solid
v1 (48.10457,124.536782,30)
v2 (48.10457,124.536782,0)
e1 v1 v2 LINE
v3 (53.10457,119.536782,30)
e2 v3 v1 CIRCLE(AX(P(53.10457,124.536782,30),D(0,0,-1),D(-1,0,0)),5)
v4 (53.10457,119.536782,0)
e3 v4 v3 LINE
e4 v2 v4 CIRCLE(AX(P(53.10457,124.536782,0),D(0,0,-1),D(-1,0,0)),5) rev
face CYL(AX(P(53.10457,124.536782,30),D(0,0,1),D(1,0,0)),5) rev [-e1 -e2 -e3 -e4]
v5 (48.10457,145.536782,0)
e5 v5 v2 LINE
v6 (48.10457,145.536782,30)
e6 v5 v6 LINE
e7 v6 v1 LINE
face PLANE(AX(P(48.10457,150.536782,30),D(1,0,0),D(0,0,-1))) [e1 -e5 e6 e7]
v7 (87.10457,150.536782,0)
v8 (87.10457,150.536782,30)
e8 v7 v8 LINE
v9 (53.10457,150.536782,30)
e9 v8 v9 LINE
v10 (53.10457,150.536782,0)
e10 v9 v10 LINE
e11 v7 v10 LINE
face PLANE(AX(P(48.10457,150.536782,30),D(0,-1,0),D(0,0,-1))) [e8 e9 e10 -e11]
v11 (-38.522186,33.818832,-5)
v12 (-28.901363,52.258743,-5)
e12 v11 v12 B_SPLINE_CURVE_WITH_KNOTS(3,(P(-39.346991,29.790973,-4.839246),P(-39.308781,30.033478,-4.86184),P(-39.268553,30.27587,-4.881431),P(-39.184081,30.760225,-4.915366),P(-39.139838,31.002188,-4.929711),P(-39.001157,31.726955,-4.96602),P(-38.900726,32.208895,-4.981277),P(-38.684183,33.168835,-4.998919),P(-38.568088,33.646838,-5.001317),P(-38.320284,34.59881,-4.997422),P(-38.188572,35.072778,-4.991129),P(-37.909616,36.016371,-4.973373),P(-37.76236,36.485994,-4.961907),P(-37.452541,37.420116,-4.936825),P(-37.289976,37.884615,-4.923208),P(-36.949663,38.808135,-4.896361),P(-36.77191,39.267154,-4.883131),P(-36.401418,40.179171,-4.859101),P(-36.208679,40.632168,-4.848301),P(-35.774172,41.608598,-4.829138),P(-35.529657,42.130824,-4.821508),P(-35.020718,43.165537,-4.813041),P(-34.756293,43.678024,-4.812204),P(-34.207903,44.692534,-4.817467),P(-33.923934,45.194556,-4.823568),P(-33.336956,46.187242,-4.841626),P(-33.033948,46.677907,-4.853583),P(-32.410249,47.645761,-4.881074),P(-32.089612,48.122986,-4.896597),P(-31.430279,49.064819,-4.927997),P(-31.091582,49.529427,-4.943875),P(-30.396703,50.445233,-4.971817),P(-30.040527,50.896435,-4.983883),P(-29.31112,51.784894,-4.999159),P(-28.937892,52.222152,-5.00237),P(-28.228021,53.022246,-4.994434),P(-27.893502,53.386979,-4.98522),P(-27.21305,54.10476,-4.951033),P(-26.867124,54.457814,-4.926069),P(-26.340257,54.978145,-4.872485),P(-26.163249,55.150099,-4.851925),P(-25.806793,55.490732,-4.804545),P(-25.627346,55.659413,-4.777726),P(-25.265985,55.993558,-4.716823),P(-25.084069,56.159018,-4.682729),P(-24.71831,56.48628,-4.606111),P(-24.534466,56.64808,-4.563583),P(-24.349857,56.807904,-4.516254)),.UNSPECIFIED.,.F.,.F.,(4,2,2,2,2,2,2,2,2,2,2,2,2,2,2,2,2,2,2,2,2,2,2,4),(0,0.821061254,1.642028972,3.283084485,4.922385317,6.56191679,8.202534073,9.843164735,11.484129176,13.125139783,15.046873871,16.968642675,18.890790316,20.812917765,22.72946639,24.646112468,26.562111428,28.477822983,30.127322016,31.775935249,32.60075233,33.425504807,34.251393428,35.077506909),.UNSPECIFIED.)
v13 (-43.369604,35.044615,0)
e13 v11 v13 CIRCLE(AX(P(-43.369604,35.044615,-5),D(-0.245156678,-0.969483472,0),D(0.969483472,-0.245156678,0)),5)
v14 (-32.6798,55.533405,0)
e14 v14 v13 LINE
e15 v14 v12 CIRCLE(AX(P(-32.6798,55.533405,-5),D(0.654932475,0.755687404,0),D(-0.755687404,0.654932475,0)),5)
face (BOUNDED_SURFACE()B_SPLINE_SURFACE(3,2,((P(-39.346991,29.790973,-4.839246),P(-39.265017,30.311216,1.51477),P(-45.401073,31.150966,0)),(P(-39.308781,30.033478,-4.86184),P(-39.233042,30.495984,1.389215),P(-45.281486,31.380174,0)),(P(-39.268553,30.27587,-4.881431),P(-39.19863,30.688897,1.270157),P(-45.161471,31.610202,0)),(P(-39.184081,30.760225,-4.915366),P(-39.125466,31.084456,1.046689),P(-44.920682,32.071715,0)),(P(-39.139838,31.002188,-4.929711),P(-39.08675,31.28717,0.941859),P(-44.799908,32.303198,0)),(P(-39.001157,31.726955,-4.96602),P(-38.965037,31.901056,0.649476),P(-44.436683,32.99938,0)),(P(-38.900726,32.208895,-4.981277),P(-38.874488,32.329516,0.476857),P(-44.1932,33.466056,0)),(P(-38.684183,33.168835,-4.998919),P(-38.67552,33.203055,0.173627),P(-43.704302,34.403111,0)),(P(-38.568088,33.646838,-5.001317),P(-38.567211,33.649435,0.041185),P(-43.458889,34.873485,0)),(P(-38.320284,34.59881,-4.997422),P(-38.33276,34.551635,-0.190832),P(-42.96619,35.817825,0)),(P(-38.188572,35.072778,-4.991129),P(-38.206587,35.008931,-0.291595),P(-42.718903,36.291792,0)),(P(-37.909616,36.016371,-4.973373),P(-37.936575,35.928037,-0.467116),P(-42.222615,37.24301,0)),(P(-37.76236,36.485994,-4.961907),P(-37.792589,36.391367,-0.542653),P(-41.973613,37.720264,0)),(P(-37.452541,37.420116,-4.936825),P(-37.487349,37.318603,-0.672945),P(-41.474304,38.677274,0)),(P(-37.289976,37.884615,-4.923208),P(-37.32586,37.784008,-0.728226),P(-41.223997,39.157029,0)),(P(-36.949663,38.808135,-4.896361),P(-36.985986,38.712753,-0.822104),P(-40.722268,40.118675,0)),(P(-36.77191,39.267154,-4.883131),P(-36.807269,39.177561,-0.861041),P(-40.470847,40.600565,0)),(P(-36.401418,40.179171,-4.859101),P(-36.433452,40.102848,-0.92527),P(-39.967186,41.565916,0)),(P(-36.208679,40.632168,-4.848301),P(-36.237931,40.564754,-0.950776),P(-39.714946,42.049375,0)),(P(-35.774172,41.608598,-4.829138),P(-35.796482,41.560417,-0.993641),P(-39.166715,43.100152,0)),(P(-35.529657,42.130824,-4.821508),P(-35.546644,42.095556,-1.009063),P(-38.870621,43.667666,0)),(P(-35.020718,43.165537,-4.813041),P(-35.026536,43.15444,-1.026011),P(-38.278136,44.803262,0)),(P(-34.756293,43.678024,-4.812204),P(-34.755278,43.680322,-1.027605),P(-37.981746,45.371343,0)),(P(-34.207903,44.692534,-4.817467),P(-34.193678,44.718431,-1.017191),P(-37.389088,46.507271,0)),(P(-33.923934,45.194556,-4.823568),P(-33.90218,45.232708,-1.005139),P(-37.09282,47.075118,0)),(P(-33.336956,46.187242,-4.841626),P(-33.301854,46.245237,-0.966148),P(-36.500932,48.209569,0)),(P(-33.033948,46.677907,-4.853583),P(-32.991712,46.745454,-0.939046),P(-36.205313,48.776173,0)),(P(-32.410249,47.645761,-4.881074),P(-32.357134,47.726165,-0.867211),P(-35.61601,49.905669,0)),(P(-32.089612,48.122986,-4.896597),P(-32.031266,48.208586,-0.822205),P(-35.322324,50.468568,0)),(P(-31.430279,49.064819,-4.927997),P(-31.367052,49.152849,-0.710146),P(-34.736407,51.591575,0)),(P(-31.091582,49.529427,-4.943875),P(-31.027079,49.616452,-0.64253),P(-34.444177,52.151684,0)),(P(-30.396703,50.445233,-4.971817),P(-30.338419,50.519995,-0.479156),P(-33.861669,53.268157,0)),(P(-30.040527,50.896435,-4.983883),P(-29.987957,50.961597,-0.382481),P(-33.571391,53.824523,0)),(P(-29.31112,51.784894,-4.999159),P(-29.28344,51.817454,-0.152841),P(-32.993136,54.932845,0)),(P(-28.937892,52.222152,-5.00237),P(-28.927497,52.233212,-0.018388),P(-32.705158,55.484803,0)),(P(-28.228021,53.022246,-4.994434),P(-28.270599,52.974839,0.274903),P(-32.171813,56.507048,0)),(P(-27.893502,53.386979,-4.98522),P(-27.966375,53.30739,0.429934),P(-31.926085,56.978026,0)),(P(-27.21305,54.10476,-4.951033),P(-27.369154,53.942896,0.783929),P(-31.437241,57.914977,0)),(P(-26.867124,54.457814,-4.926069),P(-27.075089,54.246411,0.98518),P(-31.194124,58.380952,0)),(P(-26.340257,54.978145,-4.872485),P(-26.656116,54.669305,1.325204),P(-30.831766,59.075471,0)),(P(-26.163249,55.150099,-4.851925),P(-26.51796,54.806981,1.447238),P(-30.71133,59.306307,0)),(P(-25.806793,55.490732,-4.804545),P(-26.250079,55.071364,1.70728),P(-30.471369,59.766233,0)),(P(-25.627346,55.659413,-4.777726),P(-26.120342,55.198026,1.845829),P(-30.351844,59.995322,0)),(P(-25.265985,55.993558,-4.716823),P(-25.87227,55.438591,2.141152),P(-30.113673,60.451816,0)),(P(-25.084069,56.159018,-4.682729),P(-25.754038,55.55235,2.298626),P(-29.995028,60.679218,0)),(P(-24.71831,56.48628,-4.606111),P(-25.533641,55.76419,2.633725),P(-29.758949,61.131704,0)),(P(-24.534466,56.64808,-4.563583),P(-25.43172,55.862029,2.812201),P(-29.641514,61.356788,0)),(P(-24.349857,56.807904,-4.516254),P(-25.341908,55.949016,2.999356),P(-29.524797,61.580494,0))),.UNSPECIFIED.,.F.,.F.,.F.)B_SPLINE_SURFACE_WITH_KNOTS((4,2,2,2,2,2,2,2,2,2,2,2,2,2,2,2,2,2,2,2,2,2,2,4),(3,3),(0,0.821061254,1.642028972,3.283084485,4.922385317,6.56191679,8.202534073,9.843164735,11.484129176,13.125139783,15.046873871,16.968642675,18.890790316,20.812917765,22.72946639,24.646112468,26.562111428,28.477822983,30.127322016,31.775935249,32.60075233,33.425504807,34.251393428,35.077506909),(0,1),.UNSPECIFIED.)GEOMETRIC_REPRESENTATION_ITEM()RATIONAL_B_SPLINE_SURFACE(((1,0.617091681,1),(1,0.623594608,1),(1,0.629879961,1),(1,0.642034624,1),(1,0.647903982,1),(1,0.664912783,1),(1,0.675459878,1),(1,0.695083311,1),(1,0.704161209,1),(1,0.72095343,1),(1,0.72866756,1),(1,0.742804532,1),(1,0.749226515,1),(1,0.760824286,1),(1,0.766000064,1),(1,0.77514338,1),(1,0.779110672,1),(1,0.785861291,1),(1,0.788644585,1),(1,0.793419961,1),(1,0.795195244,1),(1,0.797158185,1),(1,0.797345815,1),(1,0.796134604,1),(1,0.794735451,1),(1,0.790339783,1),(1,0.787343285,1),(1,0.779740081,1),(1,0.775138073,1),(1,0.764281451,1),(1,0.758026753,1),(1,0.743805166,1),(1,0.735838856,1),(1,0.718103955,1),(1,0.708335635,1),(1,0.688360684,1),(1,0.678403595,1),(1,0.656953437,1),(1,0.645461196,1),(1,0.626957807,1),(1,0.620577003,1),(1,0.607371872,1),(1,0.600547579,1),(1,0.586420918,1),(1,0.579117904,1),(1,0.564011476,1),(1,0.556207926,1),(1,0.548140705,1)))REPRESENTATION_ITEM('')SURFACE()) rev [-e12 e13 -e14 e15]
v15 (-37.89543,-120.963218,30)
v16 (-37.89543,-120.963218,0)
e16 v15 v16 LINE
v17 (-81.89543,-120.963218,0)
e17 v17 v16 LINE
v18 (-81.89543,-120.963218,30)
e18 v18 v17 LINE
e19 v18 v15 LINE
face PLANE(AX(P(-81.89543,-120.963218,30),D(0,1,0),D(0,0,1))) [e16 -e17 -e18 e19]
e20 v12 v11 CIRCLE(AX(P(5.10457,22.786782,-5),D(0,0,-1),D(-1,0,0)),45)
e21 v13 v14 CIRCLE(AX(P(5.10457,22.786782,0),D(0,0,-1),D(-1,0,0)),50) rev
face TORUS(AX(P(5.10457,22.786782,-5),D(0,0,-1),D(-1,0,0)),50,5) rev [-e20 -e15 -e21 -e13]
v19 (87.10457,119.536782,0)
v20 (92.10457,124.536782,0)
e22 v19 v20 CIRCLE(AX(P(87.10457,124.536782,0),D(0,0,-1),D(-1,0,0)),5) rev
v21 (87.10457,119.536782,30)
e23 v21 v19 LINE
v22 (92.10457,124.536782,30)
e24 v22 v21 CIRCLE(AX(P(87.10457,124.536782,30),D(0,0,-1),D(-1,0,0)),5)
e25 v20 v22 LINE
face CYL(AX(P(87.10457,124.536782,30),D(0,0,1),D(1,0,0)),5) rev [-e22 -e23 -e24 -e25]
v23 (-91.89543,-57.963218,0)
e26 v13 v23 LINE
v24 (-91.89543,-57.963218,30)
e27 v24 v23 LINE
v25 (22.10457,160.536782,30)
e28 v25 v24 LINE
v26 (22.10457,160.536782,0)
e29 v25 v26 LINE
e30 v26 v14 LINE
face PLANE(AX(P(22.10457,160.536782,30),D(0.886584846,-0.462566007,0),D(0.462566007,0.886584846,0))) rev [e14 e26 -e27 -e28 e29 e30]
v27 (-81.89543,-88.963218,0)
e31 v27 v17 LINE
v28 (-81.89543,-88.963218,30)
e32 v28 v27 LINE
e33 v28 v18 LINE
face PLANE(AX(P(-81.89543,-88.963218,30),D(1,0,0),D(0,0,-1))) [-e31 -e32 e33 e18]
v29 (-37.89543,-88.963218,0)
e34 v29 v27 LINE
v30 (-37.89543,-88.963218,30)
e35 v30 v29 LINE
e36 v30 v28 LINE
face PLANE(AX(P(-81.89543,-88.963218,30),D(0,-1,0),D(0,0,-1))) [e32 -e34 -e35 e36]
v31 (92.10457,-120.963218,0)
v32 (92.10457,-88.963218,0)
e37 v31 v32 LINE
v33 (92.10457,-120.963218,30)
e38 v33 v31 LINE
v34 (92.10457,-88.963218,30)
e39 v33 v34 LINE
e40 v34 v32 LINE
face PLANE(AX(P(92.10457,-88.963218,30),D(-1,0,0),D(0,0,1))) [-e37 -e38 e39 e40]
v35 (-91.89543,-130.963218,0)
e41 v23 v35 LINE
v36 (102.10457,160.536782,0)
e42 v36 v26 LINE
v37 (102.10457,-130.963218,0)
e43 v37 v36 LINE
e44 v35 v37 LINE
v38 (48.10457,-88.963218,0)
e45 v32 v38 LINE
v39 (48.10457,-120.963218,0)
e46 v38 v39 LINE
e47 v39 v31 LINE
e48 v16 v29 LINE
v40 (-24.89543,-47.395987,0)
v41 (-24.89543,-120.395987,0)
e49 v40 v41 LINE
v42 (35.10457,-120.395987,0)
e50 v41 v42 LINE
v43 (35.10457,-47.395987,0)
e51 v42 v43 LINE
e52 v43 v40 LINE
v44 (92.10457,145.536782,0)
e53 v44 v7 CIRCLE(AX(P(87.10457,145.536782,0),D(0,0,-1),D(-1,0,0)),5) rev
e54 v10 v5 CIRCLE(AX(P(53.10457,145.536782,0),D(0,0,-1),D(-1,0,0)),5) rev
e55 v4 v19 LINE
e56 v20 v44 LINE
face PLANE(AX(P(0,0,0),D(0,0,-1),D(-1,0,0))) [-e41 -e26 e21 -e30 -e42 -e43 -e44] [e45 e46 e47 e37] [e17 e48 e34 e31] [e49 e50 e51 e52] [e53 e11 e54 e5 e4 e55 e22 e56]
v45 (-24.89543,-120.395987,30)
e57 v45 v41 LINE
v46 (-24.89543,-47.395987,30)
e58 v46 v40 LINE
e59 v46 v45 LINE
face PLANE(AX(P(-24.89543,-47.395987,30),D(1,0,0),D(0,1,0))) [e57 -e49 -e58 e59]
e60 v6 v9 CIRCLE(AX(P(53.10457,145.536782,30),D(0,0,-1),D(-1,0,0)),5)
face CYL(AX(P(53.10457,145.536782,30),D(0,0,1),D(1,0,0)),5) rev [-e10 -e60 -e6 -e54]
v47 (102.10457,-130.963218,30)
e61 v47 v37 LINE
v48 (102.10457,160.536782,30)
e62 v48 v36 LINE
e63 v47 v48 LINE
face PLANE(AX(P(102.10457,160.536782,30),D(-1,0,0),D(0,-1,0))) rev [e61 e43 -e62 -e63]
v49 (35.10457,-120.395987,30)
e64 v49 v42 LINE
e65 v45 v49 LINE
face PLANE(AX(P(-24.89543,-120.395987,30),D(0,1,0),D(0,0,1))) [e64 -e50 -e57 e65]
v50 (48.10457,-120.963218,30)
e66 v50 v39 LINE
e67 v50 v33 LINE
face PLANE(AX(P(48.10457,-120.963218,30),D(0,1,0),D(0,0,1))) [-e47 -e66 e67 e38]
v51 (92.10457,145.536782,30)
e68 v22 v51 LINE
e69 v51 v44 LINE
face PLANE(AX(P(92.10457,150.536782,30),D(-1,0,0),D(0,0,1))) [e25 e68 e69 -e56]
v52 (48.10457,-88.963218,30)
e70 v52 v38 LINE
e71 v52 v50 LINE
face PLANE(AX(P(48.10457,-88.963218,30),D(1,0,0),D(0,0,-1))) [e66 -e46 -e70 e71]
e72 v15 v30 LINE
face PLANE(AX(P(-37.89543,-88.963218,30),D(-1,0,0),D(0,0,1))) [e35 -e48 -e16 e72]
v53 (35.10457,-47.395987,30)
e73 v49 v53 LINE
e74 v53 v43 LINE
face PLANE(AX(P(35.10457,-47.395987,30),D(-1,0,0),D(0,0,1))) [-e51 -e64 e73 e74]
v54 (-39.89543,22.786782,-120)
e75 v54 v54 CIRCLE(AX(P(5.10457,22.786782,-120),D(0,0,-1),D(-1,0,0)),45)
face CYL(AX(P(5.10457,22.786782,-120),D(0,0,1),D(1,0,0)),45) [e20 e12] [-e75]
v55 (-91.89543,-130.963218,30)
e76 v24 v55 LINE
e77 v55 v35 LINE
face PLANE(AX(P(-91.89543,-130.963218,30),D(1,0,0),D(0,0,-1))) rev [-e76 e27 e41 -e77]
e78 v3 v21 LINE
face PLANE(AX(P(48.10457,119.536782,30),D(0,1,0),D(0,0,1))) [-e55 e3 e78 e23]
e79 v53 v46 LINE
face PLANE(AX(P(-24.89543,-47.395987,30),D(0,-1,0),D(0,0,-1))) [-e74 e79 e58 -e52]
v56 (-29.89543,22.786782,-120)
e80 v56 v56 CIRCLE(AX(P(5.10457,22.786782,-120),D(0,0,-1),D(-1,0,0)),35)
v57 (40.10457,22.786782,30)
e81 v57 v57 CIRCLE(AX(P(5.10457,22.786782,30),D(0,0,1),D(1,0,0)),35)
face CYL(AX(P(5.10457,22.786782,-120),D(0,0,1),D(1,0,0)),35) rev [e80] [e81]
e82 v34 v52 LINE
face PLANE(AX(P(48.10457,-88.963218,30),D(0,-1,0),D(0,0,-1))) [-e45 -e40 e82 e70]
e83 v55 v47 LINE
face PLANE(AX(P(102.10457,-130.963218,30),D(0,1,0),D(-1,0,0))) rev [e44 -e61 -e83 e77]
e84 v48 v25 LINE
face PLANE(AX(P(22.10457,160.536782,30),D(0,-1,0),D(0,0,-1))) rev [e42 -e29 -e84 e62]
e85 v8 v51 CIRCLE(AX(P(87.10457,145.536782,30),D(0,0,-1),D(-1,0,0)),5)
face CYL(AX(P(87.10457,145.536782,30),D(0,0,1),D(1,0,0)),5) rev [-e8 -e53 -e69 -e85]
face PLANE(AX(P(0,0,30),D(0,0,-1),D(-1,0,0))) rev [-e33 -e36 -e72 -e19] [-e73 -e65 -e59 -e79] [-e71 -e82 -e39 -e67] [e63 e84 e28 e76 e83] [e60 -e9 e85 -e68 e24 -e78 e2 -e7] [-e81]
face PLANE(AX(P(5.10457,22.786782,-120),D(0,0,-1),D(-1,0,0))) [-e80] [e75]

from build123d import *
from build123d.topology import SkipClean

# Parameters (mm, degrees)
SKETCH2_W           = 44
SKETCH2_H           = 31
SKETCH2_H_2         = 32
SKETCH2_W_2         = 60
SKETCH2_H_3         = 73
BOSS_EXTRUDE1_DEPTH = 30
SKETCH3_R           = 45
SKETCH3_R_2         = 35
BOSS_EXTRUDE2_DEPTH = 120
FILLET1_R           = 5
SKETCH6_R           = 35
CUT_EXTRUDE1_DEPTH  = 120
FILLET2_R           = 5


with BuildPart() as part:
    # Sketch2 → Boss-Extrude1 (new body)
    with BuildSketch(Plane.XY):
        Polygon((22.104569931, 160.536781585), (102.104569931, 160.536781585), (102.104569931, -130.963218415), (-91.895430069, -130.963218415), (-91.895430069, -57.963218415), align=None)
        with Locations((70.104569931, 135.036781585)):
            Rectangle(SKETCH2_W, SKETCH2_H, mode=Mode.SUBTRACT)
        with Locations((70.104569931, -104.963218415)):
            Rectangle(SKETCH2_W, SKETCH2_H_2, mode=Mode.SUBTRACT)
        with Locations((-59.895430069, -104.963218415)):
            Rectangle(SKETCH2_W, SKETCH2_H_2, mode=Mode.SUBTRACT)
        with Locations((5.104569931, -83.895986651)):
            Rectangle(SKETCH2_W_2, SKETCH2_H_3, mode=Mode.SUBTRACT)
    extrude(amount=BOSS_EXTRUDE1_DEPTH)

    # Sketch3 → Boss-Extrude2 (add)
    with BuildSketch(Plane(origin=(0, 0, 0), x_dir=(-1, 0, 0), z_dir=(0, 0, -1))):
        with Locations((-5.104569931, 22.786781585)):
            Circle(SKETCH3_R)
        with Locations((-5.104569931, 22.786781585)):
            Circle(SKETCH3_R_2, mode=Mode.SUBTRACT)
    extrude(amount=BOSS_EXTRUDE2_DEPTH)

    # Fillet1
    fillet1_edges = [part.edges().sort_by_distance(p)[0] for p in [
        (92.104569931, 119.536781585, 15),
        (92.104569931, 150.536781585, 15),
        (48.104569931, 150.536781585, 15),
        (48.104569931, 119.536781585, 15),
    ]]
    fillet(fillet1_edges, radius=FILLET1_R)

    # Sketch6 → Cut-Extrude1 (cut)
    with SkipClean():  # the faces are left unmerged after this step: merging them gives an invalid solid
        with BuildSketch(Plane.XY.offset(30)):
            with Locations((5.104569931, 22.786781585)):
                Circle(SKETCH6_R)
        extrude(amount=-CUT_EXTRUDE1_DEPTH, mode=Mode.SUBTRACT)
    add(part.part.scale(1), mode=Mode.REPLACE)  # the faces are merged on a copy

    # Fillet2
    fillet2_edges = [part.edges().sort_by_distance(p)[0] for p in [
        (50.104569931, 22.786781585, 0),
    ]]
    fillet(fillet2_edges, radius=FILLET2_R)


solid = part.part
